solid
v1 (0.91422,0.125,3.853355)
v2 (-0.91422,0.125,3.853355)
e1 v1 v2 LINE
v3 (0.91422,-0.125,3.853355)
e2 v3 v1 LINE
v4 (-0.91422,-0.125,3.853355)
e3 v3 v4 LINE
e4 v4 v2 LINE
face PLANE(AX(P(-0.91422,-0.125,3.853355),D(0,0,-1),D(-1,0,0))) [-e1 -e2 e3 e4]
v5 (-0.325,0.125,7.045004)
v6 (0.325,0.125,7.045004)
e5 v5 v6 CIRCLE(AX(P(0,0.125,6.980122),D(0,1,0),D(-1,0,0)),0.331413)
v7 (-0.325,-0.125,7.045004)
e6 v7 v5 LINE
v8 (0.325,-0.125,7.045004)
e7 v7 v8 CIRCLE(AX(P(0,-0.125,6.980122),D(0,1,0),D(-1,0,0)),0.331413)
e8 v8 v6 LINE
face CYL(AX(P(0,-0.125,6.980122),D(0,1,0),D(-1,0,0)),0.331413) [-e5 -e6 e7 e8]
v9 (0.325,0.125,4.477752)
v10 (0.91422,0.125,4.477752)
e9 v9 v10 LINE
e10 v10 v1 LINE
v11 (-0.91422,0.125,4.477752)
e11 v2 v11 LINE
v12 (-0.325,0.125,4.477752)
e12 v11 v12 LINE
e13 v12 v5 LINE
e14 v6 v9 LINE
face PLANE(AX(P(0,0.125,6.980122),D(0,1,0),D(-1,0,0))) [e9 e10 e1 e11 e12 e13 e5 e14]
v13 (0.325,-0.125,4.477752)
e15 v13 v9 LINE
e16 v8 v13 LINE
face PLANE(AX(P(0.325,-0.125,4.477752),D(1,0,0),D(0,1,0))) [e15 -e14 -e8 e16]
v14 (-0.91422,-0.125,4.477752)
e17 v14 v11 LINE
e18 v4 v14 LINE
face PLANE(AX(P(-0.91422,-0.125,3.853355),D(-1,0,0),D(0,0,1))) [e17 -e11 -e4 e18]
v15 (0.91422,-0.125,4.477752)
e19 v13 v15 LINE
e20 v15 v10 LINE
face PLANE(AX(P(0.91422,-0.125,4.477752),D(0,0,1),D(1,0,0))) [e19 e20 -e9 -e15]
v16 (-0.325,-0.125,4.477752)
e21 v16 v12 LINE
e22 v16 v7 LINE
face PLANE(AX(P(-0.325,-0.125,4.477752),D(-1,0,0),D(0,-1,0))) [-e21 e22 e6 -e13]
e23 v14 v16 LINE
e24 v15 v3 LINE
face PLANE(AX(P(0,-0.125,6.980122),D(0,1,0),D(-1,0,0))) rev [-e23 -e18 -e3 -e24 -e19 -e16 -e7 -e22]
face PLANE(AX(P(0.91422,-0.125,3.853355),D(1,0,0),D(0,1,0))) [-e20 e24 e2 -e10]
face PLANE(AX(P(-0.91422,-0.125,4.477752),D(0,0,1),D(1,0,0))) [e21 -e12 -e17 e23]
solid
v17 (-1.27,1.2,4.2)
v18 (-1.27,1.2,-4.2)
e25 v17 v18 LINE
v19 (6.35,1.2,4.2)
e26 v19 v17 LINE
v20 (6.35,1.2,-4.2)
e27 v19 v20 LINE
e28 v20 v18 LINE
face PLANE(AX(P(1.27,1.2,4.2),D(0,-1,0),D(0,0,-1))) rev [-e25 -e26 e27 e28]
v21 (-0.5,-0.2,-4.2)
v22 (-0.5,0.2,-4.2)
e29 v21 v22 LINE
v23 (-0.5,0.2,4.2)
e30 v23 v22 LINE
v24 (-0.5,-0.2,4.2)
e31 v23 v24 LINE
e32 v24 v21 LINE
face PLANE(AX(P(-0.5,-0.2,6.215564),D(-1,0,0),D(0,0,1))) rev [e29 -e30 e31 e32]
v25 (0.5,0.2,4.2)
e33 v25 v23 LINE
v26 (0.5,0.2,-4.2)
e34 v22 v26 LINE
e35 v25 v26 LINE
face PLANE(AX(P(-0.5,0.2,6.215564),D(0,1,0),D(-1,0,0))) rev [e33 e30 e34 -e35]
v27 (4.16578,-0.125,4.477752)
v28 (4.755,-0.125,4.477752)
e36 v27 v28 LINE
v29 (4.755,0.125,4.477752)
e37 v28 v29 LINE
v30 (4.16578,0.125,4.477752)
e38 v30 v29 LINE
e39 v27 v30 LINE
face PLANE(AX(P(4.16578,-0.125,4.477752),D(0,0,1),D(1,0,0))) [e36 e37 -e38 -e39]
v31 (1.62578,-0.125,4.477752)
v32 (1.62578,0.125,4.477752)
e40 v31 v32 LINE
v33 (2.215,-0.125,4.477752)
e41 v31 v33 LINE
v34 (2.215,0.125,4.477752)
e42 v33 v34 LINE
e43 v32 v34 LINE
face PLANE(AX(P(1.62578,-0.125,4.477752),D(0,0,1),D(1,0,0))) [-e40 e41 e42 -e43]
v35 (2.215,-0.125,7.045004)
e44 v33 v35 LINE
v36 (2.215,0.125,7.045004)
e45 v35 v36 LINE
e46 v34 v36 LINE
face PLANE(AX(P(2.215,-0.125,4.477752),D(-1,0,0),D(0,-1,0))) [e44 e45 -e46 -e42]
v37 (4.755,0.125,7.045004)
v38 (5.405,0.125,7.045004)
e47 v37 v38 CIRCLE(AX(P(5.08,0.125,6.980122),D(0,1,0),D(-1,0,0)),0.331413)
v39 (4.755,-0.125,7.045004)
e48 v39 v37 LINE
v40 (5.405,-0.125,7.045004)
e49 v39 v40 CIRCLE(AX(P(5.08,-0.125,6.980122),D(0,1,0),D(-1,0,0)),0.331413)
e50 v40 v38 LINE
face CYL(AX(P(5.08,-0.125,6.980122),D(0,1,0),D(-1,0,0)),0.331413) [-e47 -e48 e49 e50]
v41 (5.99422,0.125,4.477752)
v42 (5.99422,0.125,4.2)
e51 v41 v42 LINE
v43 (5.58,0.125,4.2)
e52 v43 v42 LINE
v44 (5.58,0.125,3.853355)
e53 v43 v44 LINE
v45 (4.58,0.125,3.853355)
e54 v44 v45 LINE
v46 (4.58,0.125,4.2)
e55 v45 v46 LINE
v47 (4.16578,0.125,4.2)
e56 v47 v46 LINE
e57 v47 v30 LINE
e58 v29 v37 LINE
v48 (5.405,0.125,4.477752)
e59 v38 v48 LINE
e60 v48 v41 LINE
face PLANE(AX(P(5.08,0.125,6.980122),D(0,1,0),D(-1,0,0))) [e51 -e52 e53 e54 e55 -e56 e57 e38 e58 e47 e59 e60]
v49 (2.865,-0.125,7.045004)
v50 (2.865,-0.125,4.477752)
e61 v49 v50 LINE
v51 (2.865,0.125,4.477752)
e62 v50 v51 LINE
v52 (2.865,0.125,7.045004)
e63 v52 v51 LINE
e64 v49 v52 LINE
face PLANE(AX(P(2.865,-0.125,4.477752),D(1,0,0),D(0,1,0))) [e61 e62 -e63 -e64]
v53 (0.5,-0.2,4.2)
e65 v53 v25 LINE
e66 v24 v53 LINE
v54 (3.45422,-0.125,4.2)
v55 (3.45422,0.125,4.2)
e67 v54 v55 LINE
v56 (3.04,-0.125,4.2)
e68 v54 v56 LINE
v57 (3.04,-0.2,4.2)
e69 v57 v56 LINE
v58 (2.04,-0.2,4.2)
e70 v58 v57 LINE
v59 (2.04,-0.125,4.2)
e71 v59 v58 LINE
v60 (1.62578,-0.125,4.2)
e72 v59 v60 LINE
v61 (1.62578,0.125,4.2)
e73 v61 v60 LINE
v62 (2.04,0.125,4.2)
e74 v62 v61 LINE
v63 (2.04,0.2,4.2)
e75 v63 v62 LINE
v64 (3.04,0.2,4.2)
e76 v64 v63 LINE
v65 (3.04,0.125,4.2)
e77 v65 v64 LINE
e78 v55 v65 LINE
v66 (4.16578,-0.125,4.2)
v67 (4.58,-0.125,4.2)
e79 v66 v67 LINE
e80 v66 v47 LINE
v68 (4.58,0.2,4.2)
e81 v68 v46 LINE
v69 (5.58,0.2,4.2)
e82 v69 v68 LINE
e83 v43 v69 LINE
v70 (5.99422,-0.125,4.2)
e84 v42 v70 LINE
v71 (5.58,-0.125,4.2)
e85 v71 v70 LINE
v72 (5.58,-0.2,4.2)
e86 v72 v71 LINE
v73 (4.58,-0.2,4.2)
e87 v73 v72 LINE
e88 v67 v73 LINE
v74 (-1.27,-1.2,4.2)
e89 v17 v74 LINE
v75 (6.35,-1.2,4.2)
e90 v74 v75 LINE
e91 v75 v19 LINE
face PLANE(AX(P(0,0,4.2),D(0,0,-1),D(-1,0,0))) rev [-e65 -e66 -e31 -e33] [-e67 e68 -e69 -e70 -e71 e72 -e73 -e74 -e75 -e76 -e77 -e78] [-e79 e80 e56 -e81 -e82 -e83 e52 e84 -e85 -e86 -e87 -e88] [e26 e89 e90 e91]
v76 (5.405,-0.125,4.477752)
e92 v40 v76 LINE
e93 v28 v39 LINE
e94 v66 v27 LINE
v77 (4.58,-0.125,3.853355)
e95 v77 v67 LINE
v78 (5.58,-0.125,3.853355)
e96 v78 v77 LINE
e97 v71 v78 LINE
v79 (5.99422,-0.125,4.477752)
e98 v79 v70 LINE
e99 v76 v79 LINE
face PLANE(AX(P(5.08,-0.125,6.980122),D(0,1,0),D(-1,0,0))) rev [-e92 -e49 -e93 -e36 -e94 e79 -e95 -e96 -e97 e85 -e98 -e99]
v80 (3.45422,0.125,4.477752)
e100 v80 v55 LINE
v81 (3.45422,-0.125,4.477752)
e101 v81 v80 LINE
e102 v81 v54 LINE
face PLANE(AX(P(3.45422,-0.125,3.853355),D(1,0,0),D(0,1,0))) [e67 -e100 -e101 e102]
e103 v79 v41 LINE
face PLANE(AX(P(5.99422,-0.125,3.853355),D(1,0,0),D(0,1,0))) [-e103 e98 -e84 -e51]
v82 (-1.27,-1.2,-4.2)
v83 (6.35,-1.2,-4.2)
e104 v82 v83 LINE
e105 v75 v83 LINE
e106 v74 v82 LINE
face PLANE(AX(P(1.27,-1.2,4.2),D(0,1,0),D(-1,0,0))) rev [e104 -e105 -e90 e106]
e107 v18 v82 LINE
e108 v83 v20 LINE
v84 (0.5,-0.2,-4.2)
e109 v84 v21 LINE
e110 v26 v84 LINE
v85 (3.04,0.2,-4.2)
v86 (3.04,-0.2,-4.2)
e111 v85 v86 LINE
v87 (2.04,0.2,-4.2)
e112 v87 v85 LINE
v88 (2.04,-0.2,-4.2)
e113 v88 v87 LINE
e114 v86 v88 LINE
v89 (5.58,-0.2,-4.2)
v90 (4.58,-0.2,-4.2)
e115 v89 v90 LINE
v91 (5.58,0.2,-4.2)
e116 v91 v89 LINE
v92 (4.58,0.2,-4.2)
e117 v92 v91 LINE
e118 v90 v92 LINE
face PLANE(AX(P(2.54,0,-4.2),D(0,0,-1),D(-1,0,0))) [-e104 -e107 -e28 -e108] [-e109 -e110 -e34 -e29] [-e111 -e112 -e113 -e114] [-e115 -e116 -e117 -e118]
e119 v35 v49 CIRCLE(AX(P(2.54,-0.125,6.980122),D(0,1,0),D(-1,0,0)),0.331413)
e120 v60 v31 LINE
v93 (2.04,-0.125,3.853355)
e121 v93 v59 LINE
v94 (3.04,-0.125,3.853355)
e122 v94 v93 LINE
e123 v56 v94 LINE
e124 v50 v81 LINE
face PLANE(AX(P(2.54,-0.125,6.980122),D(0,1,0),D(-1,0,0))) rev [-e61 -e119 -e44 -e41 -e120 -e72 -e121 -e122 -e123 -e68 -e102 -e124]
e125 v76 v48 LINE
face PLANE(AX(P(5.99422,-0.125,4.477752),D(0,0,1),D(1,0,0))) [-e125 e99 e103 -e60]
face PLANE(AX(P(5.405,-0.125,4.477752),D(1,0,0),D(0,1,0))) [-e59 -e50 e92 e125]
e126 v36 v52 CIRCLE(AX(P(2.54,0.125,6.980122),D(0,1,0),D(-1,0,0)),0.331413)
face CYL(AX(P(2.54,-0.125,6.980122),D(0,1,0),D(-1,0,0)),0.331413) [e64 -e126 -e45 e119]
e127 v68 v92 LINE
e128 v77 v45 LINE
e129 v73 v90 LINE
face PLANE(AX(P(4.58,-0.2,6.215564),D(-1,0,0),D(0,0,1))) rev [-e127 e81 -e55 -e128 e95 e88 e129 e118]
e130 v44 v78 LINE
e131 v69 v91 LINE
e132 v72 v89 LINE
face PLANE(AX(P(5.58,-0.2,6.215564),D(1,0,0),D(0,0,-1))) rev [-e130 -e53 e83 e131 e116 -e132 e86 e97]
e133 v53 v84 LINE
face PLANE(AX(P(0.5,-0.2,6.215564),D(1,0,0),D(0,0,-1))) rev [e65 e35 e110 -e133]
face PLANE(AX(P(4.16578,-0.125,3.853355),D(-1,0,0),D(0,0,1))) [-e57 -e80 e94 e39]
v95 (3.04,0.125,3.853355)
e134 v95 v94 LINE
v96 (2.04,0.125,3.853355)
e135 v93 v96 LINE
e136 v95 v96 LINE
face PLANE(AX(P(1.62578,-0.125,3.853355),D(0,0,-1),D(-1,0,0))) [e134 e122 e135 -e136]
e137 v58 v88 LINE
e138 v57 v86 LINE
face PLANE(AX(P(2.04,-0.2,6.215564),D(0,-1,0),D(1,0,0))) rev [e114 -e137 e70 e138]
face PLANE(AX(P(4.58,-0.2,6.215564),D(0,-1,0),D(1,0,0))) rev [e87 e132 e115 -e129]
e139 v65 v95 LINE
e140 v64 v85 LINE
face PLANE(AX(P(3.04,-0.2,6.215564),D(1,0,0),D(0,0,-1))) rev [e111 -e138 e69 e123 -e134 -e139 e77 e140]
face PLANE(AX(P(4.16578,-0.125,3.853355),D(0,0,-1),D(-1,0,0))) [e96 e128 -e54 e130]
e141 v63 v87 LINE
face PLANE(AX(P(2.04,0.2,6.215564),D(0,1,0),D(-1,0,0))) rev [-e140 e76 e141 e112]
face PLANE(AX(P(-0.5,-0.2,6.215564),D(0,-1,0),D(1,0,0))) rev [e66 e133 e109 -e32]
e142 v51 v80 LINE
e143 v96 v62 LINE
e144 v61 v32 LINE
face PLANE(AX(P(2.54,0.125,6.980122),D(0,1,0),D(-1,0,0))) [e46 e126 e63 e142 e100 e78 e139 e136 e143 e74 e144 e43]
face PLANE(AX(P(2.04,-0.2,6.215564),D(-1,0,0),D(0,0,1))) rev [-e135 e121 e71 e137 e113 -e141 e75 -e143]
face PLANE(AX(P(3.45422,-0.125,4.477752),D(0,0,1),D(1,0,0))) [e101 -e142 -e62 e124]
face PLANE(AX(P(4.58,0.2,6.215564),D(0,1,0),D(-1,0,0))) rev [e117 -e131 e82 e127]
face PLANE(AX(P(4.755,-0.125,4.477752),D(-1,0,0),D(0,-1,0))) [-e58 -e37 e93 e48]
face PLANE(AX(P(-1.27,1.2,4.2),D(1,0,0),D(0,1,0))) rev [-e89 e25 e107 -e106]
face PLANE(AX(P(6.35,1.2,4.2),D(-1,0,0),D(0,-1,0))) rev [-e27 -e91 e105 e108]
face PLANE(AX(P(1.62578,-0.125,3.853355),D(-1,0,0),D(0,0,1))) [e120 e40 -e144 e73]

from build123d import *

# Parameters (mm, degrees)
SKETCH1_W               = 2.54
SKETCH1_H               = 2.4
SKETCH1_W_2             = 1.4
SKETCH1_H_2             = 1.45
BOSS_EXTRUDE1_DEPTH     = 4.2
BOSS_EXTRUDE3_START     = -1.2
BOSS_EXTRUDE3_DEPTH     = 0.125
LPATTERN1_START         = -0.125
LPATTERN1_DEPTH         = 0.25
LPATTERN1_2_DEPTH       = 0.25
LPATTERN1_START_2       = -4.2
LPATTERN1_3_OUTLINE_W   = 5.08
LPATTERN1_3_OUTLINE_H   = 2.4
LPATTERN1_3_OUTLINE_W_2 = 1.4
LPATTERN1_3_OUTLINE_H_2 = 1.45
LPATTERN1_3_DEPTH       = 8.4
SKETCH5_W               = 1.4
SKETCH5_H               = 1.45
SKETCH5_W_2             = 1
SKETCH5_H_2             = 0.4
BOSS_EXTRUDE4_DEPTH     = 8.4
LPATTERN2_COUNT         = 3
LPATTERN2_PITCH         = 2.54


# Read off the part's stored shape, not the designer's step: LPattern1
with BuildPart() as part:
    # Sketch1 → Boss-Extrude1 (new, symmetric)
    with BuildSketch(Plane.XY):
        Rectangle(SKETCH1_W, SKETCH1_H)
        Rectangle(SKETCH1_W_2, SKETCH1_H_2, mode=Mode.SUBTRACT)
    extrude(amount=BOSS_EXTRUDE1_DEPTH, both=True)

    # LPattern1 3 outline → LPattern1 3 (add)
    with BuildSketch(Plane.XY.offset(LPATTERN1_START_2)):
        with Locations((3.81, 0)):
            Rectangle(LPATTERN1_3_OUTLINE_W, LPATTERN1_3_OUTLINE_H)
        with Locations((2.54, 0)):
            Rectangle(LPATTERN1_3_OUTLINE_W_2, LPATTERN1_3_OUTLINE_H_2, mode=Mode.SUBTRACT)
        with Locations((5.08, 0)):
            Rectangle(LPATTERN1_3_OUTLINE_W_2, LPATTERN1_3_OUTLINE_H_2, mode=Mode.SUBTRACT)
    extrude(amount=LPATTERN1_3_DEPTH)

    # Sketch5 → Boss-Extrude4 (add)
    with BuildSketch(Plane(origin=(0, 0, -4.2), x_dir=(-1, 0, 0), z_dir=(0, 0, -1))):
        Rectangle(SKETCH5_W, SKETCH5_H)
        Rectangle(SKETCH5_W_2, SKETCH5_H_2, mode=Mode.SUBTRACT)
    boss_extrude4 = extrude(amount=-BOSS_EXTRUDE4_DEPTH)



with BuildPart() as body_2:
    # Sketch3 → Boss-Extrude3 (new, symmetric)
    with BuildSketch(Plane(origin=(0, 1.2, 0), x_dir=(1, 0, 0), z_dir=(0, 1, 0)).offset(BOSS_EXTRUDE3_START)):
        with BuildLine():
            Line((-0.914219602, -3.853355377), (-0.914219602, -4.477752268))
            Line((-0.914219602, -4.477752268), (-0.325, -4.477752268))
            Line((-0.325, -4.477752268), (-0.325, -7.045003795))
            ThreePointArc((-0.325, -7.045003795), (0, -7.311534777), (0.325, -7.045003795))
            Line((0.325, -7.045003795), (0.325, -4.477752268))
            Line((0.325, -4.477752268), (0.914219602, -4.477752268))
            Line((0.914219602, -4.477752268), (0.914219602, -3.853355377))
            Line((0.914219602, -3.853355377), (-0.914219602, -3.853355377))
        make_face()
    extrude(amount=BOSS_EXTRUDE3_DEPTH, both=True)


with BuildPart() as body_3:
    # LPattern1 outline → LPattern1 (new body)
    with BuildSketch(Plane(origin=(0, 0, 0), x_dir=(1, 0, 0), z_dir=(0, 1, 0)).offset(LPATTERN1_START)):
        with BuildLine():
            Line((3.454219602, -4.477752268), (3.454219602, -3.853355377))
            Line((3.454219602, -3.853355377), (1.625780398, -3.853355377))
            Line((1.625780398, -3.853355377), (1.625780398, -4.477752268))
            Line((1.625780398, -4.477752268), (2.215, -4.477752268))
            Line((2.215, -4.477752268), (2.215, -7.045003795))
            ThreePointArc((2.215, -7.045003795), (2.54, -7.311534777), (2.865, -7.045003795))
            Line((2.865, -7.045003795), (2.865, -4.477752268))
            Line((2.865, -4.477752268), (3.454219602, -4.477752268))
        make_face()
    extrude(amount=LPATTERN1_DEPTH)


with BuildPart() as body_4:
    # LPattern1 2 outline → LPattern1 2 (new body)
    with BuildSketch(Plane(origin=(0, 0, 0), x_dir=(1, 0, 0), z_dir=(0, 1, 0)).offset(LPATTERN1_START)):
        with BuildLine():
            Line((5.994219602, -4.477752268), (5.994219602, -3.853355377))
            Line((5.994219602, -3.853355377), (4.165780398, -3.853355377))
            Line((4.165780398, -3.853355377), (4.165780398, -4.477752268))
            Line((4.165780398, -4.477752268), (4.755, -4.477752268))
            Line((4.755, -4.477752268), (4.755, -7.045003795))
            ThreePointArc((4.755, -7.045003795), (5.08, -7.311534777), (5.405, -7.045003795))
            Line((5.405, -7.045003795), (5.405, -4.477752268))
            Line((5.405, -4.477752268), (5.994219602, -4.477752268))
        make_face()
    extrude(amount=LPATTERN1_2_DEPTH)


with BuildPart() as part_1:
    add(part.part)

    add(body_3.part)  # LPattern2 merges body 3

    add(body_4.part)  # LPattern2 merges body 4
    # LPattern2: Boss-Extrude4 ×3
    with Locations(*[(i * LPATTERN2_PITCH, 0, 0) for i in range(1, LPATTERN2_COUNT)]):
        add(boss_extrude4)


solid = Compound([body_2.part, part_1.part])
